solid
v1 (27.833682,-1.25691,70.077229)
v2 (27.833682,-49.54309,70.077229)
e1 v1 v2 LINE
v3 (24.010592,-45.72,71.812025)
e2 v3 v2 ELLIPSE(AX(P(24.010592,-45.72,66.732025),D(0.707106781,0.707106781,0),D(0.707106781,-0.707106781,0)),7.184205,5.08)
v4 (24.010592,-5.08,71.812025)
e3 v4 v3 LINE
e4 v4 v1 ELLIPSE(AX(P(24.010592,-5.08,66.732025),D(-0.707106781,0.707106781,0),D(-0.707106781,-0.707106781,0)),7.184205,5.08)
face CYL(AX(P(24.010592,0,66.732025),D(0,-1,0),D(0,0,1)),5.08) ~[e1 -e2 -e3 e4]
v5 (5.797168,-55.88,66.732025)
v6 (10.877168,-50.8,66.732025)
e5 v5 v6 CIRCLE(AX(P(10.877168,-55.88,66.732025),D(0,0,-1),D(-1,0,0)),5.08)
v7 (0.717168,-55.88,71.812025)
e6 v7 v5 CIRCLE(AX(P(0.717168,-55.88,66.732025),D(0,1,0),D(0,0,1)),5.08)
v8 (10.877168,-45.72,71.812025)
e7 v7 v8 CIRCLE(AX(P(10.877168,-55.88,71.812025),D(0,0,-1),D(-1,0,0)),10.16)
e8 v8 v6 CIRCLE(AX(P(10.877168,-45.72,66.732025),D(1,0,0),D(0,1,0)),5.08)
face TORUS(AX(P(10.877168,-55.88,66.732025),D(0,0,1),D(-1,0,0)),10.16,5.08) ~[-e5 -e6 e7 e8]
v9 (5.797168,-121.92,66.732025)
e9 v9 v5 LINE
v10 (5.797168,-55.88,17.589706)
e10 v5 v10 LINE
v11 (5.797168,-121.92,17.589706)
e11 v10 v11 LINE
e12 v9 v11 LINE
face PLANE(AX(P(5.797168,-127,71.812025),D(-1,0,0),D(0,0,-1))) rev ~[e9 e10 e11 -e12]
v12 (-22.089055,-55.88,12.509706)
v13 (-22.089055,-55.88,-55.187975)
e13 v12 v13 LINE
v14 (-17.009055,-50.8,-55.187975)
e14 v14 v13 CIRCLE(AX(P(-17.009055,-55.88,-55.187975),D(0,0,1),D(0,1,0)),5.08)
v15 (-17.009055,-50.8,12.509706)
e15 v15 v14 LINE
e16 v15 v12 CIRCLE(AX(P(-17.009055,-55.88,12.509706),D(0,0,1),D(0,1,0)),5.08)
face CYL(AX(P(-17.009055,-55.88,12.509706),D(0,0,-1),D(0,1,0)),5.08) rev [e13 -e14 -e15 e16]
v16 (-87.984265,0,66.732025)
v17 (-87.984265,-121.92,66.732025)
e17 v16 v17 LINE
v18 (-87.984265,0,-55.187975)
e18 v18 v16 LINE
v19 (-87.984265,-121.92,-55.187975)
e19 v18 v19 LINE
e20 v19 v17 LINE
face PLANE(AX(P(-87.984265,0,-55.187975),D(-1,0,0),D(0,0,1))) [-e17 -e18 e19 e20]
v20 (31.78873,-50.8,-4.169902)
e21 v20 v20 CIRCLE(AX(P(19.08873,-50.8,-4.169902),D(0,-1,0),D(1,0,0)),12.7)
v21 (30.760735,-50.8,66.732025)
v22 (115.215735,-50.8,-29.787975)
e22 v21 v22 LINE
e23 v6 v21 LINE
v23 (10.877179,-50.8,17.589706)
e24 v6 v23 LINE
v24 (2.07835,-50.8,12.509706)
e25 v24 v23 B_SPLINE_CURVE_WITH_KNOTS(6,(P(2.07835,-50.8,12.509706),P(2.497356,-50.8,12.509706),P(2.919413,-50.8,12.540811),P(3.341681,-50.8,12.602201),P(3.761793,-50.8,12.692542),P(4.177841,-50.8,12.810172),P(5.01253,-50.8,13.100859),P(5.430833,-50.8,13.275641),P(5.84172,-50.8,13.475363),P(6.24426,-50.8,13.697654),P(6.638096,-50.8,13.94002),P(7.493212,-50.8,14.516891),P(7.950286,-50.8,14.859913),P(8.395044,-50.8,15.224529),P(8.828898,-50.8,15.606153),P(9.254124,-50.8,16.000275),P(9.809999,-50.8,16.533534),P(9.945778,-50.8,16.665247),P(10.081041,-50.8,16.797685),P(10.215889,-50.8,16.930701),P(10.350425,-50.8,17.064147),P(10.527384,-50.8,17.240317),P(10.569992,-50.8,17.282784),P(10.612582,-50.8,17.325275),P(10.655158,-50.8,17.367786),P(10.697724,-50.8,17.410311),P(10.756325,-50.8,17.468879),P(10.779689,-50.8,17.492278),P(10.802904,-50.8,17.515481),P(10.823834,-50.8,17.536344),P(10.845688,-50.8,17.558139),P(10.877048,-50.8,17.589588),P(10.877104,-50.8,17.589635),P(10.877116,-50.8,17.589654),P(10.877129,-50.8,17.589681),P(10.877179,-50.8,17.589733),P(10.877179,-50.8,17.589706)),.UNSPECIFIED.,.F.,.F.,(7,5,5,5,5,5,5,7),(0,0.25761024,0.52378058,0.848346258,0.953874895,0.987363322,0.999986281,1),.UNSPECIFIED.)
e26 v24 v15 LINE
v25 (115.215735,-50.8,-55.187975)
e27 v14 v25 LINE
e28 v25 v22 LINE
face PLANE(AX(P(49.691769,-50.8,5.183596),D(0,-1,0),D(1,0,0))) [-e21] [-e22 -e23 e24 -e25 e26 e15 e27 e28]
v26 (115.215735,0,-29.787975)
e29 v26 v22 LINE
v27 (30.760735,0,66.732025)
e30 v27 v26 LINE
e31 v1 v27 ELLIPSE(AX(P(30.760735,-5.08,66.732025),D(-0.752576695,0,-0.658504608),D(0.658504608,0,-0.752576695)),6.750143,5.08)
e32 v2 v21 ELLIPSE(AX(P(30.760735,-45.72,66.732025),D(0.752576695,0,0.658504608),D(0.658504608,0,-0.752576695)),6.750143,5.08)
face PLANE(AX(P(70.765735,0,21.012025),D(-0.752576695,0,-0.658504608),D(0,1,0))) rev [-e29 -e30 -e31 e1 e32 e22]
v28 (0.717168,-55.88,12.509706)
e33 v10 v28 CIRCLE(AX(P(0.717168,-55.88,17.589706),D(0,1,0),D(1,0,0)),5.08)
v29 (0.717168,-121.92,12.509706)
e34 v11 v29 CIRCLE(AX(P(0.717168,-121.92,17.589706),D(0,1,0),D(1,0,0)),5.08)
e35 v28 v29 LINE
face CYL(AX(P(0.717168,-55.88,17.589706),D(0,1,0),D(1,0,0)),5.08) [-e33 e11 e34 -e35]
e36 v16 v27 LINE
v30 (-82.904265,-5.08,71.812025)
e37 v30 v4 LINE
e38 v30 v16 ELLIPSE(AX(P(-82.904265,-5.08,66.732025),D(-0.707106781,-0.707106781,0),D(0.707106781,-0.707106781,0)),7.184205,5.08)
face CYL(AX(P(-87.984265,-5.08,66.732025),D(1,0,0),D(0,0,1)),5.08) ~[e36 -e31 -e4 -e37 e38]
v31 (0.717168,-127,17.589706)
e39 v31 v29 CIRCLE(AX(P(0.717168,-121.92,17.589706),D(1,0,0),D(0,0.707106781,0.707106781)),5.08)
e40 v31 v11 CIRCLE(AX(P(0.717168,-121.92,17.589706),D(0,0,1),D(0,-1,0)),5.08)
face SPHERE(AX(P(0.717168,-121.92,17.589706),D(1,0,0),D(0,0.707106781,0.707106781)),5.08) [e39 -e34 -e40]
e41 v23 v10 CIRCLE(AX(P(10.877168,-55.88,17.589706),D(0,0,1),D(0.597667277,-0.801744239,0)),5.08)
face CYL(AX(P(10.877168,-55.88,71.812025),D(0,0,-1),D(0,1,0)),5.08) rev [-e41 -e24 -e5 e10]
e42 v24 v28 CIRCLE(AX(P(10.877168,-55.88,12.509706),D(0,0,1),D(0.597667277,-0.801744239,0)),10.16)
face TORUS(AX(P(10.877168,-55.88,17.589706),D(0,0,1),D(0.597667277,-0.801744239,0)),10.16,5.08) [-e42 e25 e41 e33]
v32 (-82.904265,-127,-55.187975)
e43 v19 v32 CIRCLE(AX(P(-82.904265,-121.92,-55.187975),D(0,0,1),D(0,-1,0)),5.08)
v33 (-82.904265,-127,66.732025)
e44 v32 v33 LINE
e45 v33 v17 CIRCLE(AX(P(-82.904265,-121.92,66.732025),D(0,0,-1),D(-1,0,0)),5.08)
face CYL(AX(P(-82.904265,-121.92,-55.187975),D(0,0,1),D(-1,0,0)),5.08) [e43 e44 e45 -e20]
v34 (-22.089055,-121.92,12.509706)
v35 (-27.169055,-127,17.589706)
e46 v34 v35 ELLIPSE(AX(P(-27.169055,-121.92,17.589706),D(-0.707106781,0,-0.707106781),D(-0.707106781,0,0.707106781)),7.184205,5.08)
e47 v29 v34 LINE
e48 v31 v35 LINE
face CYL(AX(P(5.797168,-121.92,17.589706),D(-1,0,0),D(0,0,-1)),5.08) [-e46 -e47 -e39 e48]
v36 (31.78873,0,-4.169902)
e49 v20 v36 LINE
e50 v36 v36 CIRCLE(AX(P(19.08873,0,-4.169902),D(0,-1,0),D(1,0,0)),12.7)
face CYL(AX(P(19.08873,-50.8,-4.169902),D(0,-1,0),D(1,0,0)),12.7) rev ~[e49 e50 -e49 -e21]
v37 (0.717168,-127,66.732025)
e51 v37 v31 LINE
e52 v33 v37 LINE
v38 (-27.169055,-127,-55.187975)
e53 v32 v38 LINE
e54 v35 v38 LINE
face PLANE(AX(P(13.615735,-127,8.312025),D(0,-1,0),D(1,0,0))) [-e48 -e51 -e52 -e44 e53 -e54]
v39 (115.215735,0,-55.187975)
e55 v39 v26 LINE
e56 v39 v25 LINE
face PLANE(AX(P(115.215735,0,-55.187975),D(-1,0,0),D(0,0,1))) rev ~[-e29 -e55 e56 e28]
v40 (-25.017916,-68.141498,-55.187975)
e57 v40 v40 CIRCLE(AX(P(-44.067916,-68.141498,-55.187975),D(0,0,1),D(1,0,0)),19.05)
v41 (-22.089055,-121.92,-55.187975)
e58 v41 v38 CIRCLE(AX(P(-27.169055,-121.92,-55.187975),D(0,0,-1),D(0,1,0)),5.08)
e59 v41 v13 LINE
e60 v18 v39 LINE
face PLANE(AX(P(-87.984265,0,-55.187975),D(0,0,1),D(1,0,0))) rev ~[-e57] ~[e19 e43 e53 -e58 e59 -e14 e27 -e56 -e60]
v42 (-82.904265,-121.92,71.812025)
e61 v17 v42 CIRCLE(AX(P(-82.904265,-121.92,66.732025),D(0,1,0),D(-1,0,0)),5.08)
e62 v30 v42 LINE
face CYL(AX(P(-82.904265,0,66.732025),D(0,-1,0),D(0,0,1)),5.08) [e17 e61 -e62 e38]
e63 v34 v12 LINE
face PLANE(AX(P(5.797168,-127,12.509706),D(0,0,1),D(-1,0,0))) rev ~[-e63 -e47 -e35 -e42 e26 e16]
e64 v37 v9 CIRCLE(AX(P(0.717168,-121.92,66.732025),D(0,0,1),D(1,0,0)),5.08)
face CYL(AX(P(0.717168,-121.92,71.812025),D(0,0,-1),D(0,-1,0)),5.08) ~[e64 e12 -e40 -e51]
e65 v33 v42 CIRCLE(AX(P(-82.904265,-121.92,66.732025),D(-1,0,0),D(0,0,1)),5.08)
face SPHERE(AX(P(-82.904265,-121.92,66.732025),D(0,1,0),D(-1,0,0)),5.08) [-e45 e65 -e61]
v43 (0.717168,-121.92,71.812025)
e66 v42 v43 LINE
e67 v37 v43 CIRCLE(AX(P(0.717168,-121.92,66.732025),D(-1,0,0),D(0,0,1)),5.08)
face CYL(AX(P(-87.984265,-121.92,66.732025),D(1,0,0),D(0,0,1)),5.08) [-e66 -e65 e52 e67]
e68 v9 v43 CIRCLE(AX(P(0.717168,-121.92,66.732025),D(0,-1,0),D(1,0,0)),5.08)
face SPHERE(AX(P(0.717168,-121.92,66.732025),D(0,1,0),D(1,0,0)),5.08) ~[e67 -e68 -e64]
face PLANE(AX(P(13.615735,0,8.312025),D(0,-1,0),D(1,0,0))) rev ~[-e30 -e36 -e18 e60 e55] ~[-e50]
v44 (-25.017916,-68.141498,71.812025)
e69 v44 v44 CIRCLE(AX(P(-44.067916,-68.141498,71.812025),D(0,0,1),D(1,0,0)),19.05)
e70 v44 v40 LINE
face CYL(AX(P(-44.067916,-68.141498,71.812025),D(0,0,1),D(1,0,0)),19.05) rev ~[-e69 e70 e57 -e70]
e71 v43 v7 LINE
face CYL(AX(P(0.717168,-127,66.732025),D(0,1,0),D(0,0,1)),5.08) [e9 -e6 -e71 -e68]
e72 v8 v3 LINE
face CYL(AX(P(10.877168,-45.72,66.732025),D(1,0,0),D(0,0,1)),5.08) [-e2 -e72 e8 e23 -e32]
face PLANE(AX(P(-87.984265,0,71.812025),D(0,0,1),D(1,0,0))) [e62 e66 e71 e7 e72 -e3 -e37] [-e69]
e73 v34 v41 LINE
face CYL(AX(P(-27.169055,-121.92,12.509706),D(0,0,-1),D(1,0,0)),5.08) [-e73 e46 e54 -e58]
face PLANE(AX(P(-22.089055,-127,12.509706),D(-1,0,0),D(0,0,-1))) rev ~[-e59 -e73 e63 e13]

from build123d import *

# Parameters (mm, degrees)
F0_W         = 203.2
F0_H         = 127
F1_DEPTH     = 127
F3_DEPTH     = 76.2
F4_SIZE2     = 101.6
F4_SIZE      = 88.9
F5_F1_R      = 5.08
F5_F2_R      = 5.08
F6_T1_DEPTH  = 66.04
F6_S5_W      = 5.1816
F6_S5_H      = 5.1816
F6_T6_DEPTH  = 5.1816
F6_T12_ANGLE = 233.2969892374
F7_R         = 12.7
F8_DEPTH     = 50.801
F9_R         = 19.05
F10_DEPTH    = 127.0010001


# Not quite as in the source:
# - a fillet or chamfer that OpenCascade refuses, or shapes differently, is made with other operations: its cross-section is extruded or revolved along the edge and cut away or added


with BuildPart() as f1:
    # F0 (on Front) → F1 (new body)
    with BuildSketch(Plane.XZ):
        with Locations((13.6157348752, 8.31202526)):
            Rectangle(F0_W, F0_H)
    extrude(amount=F1_DEPTH)

    # F2 (on face) → F3 (cut)
    with BuildSketch(Plane.XZ.offset(127)):
        Polygon((115.2157348752, 71.81202526), (5.7971677743, 71.81202526), (5.7971677743, 12.5097064301), (-22.089054808, 12.5097064301), (-22.089054808, -55.18797474), (115.2157348752, -55.18797474), align=None)
    extrude(amount=-F3_DEPTH, mode=Mode.SUBTRACT)

    # F4
    f4_edges = [f1.edges().sort_by_distance(p)[0] for p in [
        (115.215735, -25.4, 71.812025),
    ]]
    f4_side = f1.faces().sort_by_distance((-8.764887, -51.376752, 71.812025))[0]
    chamfer(f4_edges, length=F4_SIZE, length2=F4_SIZE2, reference=f4_side)

    # F5: fillet of radius 5.08 on 11 edges, made by hand

    # F5_f1
    f5_f1_edges = [f1.edges().sort_by_distance(p)[0] for p in [
        (5.7971677743, -50.8, 42.1608658451),
        (-22.089054808, -50.8, -21.3391341549),
    ]]
    fillet(f5_f1_edges, radius=F5_F1_R)

    # F5_f2
    f5_f2_edges = [f1.edges().sort_by_distance(p)[0] for p in [
        (5.7971677743, -91.44, 71.81202526),
        (5.7971677743, -127, 42.1608658451),
        (26.3157348752, -25.4, 71.81202526),
        (-30.8342651248, 0, 71.81202526),
        (-87.9842651248, -63.5, 71.81202526),
        (-8.1459435169, -127, 12.5097064301),
        (-22.089054808, -127, -21.3391341549),
        (-87.9842651248, -127, 8.31202526),
        (-41.0935486753, -127, 71.81202526),
        (7.2850653259, -52.2878975516, 71.81202526),
    ]]
    fillet(f5_f2_edges, radius=F5_F2_R)

    # F6: fillet of radius 5.08 on 2 edges, made by hand

    # F6_s2 → F6_t1 (cut)
    with BuildSketch(Plane.XZ.offset(55.88)):
        with BuildLine():
            ThreePointArc((5.7971677743, 17.5897064301), (4.3092702227, 13.9976039817), (0.7171677743, 12.5097064301))
            Line((0.7171677743, 12.5097064301), (5.7971677743, 12.5097064301))
            Line((5.7971677743, 12.5097064301), (5.7971677743, 17.5897064301))
        make_face()
    extrude(amount=F6_T1_DEPTH, mode=Mode.SUBTRACT)


with BuildPart() as f6_tool4:
    # F6_s5 → F6_t6 (new body)
    with BuildSketch(Plane.YZ.offset(0.7171677743)):
        with Locations((-124.5108, 14.9989064301)):
            Rectangle(F6_S5_W, F6_S5_H)
    extrude(amount=F6_T6_DEPTH)

    # F6_s7 → F6_t8 (revolve, cut)
    with BuildSketch(Plane(origin=(0.7171677743, -121.92, 17.5897064301), x_dir=(0, 0.7071067812, 0.7071067812), z_dir=(0, 0.7071067812, -0.7071067812))):
        with BuildLine():
            ThreePointArc((0, -5.08), (5.08, 0), (0, 5.08))
            Line((0, 5.08), (0, -5.08))
        make_face()
    revolve(axis=Axis((0.7171677743, -121.92, 17.5897064301), (1, 0, 0)), mode=Mode.SUBTRACT)


with BuildPart() as f1_1:
    add(f1.part)

    # F6_t3: cut F6_tool4
    add(f6_tool4.part, mode=Mode.SUBTRACT)


with BuildPart() as f6_tool10:
    # F6_s11 → F6_t12 (revolve)
    with BuildSketch(Plane(origin=(-19.784595187, -14.7486000708, 0), x_dir=(0, 0, 1), z_dir=(-0.8017442393, -0.5976672776, 0))):
        with BuildLine():
            ThreePointArc((17.5897064301, -56.382395344), (13.9976039817, -57.8702928955), (12.5097064301, -61.462395344))
            Line((12.5097064301, -61.462395344), (12.5097064301, -56.382395344))
            Line((12.5097064301, -56.382395344), (17.5897064301, -56.382395344))
        make_face()
    revolve(axis=Axis((10.8771677743, -55.88, 12.5097064301), (0, 0, 1)), revolution_arc=F6_T12_ANGLE)

    split(bisect_by=Plane.XZ.offset(50.8), keep=Keep.TOP)


with BuildPart() as f1_2:
    add(f1_1.part)

    # F6_t9: cut F6_tool10
    add(f6_tool10.part, mode=Mode.SUBTRACT)

    # F7 (on face) → F8 (cut, through all)
    with BuildSketch(Plane.XZ.offset(50.8)):
        with Locations((19.088730216, -4.1699022986)):
            Circle(F7_R)
    extrude(amount=-F8_DEPTH, mode=Mode.SUBTRACT)

    # F9 (on face) → F10 (cut, through all)
    with BuildSketch(Plane.XY.offset(71.81202526)):
        with Locations((-44.067915529, -68.1414976716)):
            Circle(F9_R)
    extrude(amount=-F10_DEPTH, mode=Mode.SUBTRACT)


solid = f1_2.part
